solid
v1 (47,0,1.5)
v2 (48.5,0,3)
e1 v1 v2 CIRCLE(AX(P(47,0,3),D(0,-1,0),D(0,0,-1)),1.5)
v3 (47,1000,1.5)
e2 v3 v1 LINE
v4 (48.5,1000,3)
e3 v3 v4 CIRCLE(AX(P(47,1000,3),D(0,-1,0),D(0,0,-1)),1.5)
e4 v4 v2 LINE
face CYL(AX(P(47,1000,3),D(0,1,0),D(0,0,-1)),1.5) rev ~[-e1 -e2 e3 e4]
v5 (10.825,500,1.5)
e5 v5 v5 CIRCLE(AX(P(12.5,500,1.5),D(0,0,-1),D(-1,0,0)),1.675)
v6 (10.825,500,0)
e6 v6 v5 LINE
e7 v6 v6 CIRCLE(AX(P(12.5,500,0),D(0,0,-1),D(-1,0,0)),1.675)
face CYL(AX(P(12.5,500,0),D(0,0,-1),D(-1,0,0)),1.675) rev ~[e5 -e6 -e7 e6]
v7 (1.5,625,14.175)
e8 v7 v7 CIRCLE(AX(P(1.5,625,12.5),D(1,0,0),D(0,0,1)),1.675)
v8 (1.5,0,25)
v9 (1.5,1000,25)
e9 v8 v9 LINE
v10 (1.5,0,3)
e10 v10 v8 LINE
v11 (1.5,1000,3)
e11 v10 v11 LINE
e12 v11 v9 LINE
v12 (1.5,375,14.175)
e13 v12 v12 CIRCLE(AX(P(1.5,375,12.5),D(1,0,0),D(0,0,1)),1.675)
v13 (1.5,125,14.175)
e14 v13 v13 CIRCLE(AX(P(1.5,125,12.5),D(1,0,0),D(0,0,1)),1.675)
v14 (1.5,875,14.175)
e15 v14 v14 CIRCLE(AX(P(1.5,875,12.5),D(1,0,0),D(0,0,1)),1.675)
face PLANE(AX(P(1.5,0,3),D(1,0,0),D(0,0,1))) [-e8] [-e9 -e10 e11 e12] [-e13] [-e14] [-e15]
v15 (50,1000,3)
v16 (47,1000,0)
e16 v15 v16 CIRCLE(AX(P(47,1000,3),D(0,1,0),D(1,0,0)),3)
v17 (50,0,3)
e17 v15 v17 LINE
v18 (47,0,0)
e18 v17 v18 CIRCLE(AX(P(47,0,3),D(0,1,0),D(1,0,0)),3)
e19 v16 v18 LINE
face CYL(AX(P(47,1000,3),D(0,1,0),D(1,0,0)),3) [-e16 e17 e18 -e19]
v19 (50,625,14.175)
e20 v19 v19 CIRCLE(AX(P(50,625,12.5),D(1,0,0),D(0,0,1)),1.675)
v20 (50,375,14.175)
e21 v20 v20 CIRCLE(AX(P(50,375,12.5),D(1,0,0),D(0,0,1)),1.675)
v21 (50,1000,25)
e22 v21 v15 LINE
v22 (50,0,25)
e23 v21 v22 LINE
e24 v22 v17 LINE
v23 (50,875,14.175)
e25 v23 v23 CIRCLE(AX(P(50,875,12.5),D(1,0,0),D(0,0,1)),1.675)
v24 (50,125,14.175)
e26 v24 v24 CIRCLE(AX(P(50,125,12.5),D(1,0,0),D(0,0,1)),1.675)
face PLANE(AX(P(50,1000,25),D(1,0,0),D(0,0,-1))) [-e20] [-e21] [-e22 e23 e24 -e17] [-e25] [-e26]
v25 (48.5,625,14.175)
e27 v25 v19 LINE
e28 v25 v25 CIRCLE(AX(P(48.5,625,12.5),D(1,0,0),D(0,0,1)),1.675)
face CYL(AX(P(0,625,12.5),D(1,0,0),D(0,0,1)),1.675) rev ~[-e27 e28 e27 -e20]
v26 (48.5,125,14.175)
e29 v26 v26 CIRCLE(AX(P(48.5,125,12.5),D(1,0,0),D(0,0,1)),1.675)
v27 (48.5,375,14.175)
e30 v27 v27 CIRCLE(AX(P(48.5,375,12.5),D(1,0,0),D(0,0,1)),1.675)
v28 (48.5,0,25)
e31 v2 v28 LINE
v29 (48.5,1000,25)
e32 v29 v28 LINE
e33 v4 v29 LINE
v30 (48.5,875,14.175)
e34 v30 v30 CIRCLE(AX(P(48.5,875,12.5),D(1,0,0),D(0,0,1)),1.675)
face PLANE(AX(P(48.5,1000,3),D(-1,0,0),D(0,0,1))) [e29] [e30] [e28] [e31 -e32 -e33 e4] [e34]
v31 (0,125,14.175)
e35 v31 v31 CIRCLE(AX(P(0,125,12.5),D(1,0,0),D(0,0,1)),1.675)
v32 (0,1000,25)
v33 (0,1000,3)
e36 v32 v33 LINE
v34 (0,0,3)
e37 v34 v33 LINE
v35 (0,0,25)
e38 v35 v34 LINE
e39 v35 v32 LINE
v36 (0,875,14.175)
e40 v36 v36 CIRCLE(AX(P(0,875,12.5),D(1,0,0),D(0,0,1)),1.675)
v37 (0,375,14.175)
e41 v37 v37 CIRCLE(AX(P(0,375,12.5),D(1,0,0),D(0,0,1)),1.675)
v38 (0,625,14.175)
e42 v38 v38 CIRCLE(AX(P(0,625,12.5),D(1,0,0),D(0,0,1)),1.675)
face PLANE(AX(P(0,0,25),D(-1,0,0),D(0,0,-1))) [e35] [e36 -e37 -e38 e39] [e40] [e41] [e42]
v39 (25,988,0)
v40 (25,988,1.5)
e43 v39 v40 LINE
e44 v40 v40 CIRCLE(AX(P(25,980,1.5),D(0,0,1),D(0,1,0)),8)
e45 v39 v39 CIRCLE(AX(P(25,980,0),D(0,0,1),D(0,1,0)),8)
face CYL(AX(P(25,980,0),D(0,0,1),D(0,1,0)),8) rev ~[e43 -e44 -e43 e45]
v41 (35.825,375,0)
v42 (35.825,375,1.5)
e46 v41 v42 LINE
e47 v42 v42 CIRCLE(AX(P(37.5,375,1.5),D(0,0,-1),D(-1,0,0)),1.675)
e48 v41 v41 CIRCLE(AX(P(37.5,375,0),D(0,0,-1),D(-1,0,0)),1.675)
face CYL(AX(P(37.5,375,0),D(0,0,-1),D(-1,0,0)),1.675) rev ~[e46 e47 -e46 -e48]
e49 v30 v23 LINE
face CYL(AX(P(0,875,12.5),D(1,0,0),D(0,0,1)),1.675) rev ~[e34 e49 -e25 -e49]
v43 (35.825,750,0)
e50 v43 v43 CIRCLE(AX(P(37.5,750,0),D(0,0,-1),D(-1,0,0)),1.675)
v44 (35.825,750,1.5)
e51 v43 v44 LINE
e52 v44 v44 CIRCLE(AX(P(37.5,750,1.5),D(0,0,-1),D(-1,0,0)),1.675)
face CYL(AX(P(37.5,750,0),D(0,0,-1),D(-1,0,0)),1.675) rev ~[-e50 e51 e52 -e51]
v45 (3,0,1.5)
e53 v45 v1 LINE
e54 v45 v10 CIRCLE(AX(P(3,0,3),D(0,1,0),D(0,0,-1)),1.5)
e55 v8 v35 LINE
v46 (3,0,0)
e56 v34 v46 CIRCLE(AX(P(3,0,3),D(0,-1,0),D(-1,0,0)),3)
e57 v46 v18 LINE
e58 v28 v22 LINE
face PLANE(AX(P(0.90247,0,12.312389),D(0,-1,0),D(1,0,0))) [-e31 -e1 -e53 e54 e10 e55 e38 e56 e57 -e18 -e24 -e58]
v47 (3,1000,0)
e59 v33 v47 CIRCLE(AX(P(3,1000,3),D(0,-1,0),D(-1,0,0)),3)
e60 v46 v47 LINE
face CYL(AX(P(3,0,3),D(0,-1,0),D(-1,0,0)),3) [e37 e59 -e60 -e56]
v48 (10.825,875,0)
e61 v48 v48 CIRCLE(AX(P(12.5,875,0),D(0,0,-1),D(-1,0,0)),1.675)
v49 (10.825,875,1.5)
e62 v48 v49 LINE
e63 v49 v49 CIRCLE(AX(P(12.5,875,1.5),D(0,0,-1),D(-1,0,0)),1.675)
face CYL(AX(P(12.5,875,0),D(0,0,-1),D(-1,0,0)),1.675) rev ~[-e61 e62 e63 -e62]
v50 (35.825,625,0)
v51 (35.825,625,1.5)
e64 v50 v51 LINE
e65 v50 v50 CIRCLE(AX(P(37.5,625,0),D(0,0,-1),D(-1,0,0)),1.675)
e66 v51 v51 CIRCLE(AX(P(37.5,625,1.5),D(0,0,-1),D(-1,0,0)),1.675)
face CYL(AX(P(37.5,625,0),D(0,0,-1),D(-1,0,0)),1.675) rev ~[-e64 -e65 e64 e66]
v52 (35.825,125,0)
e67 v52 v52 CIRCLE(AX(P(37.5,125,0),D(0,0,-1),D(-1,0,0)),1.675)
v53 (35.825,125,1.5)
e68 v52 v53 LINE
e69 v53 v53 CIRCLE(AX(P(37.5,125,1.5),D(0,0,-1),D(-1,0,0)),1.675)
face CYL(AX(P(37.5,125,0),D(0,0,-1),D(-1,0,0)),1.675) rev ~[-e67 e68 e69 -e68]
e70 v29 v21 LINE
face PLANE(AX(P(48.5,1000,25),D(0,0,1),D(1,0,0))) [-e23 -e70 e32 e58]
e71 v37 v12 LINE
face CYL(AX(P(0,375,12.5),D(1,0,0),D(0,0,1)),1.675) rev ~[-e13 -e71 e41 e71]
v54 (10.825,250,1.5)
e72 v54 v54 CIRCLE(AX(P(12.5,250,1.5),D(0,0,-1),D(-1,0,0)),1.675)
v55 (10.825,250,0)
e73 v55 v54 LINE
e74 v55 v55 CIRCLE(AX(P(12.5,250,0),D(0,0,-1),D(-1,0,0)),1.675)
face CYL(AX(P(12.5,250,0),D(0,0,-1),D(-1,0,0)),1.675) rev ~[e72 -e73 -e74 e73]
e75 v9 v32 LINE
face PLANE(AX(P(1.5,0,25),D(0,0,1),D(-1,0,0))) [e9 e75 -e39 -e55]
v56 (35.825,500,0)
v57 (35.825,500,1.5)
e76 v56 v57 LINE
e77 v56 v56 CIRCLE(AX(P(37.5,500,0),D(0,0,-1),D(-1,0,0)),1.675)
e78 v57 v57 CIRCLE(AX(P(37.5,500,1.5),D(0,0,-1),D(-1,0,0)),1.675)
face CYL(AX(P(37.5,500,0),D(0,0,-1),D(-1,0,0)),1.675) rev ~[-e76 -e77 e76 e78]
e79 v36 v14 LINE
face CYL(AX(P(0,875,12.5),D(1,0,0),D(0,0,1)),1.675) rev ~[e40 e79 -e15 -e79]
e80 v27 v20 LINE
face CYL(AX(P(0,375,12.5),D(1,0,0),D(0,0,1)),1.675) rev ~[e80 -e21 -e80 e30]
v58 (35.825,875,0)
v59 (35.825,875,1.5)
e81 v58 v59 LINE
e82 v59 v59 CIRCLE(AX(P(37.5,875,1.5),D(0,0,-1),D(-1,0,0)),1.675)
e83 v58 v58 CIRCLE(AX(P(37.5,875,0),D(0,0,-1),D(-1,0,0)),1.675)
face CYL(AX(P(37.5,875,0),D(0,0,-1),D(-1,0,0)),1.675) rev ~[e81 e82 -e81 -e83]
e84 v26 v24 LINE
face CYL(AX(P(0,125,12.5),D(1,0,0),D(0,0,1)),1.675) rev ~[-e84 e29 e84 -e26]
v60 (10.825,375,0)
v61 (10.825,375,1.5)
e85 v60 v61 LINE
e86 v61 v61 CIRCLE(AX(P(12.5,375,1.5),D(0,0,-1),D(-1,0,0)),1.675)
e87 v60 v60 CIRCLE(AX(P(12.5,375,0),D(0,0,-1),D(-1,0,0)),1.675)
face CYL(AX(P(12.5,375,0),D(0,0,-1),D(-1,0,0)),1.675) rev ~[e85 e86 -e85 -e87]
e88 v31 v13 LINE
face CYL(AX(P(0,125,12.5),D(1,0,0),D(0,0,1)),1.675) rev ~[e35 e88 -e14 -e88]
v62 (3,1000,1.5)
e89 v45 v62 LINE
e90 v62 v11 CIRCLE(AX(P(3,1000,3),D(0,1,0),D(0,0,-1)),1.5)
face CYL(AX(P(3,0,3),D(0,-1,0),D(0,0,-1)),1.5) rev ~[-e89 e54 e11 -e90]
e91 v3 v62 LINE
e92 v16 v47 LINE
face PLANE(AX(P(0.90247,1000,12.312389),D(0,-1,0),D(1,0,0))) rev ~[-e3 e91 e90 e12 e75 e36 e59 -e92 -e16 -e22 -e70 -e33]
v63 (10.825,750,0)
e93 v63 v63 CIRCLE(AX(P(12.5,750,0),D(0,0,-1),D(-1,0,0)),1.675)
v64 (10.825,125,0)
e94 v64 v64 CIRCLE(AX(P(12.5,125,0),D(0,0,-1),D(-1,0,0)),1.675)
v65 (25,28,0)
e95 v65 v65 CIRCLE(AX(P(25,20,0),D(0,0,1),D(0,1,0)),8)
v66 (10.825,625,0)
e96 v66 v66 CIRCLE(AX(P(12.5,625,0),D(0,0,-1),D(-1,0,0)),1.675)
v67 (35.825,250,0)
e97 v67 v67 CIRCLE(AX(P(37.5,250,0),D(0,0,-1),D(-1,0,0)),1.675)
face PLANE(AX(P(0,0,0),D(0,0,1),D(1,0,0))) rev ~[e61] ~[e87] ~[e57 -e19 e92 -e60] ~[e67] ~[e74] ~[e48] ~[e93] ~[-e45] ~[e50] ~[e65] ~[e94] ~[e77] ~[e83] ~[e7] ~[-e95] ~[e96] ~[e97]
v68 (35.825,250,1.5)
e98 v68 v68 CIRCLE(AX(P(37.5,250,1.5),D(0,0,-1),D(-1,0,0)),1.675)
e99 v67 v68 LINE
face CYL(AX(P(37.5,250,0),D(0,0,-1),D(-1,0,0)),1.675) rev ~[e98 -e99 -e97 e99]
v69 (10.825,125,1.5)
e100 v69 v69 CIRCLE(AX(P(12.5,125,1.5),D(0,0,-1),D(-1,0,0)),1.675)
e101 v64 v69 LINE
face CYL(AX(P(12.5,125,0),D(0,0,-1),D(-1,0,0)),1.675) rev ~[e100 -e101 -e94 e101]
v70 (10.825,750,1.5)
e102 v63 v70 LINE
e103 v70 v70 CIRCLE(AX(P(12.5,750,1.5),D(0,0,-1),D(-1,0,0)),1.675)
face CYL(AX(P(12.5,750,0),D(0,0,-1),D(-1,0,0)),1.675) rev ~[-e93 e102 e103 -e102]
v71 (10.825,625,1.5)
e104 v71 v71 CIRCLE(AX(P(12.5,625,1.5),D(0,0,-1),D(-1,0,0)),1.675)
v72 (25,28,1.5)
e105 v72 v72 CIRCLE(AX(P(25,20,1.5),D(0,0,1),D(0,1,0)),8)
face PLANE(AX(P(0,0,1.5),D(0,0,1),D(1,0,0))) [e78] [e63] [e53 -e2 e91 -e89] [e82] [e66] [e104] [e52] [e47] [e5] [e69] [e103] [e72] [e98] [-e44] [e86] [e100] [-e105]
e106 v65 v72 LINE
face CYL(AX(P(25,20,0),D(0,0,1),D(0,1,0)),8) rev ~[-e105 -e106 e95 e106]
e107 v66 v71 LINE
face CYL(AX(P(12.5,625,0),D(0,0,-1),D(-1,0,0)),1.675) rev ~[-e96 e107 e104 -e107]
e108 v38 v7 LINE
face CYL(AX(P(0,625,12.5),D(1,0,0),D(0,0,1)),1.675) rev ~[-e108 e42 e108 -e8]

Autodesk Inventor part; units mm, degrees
ref_plane "YZ Plane" through (0, 0, 0) normal (1, 0, 0) x (0, 1, 0)
ref_plane "XZ Plane" through (0, 0, 0) normal (0, 1, 0) x (-1, 0, 0)
ref_plane "XY Plane" through (0, 0, 0) normal (0, 0, 1) x (1, 0, 0)
sketch "Sketch1" plane through (0, 0, 0) normal (0, 0, 1) x (1, 0, 0)
  line L0 (0, 0) -> (50, 0)
  line L1 (50, 0) -> (50, 1000)
  line L2 (50, 1000) -> (0, 1000)
  line L3 (0, 1000) -> (0, 0)
  dimension "d0" = 50
  dimension "d1" = 1000
extrude "Plate1" add sketch "Sketch1" along normal blind 1.5
sketch "Sketch2" plane through (48.5, 1000, 0) normal (1, 0, 0) x (0, 1, 0)
  line L0 (-1000, 0) -> (0, 0)
  line L1 (0, 0) -> (0, 25)
  line L2 (0, 25) -> (-1000, 25)
  line L3 (-1000, 25) -> (-1000, 0)
edge flange "Flange1" height 20 angle 90 thickness 1.5 bend radius 1.5 thickness toward (1, 0, 0) relief tear relief width 1.5 relief depth 0.75 edges at (50, 500, 1.5) wall of the first edge with corners at (48.5, 0, 0) (48.5, 1000, 0) (48.5, 1000, 25) (48.5, 0, 25)
bend "Bend1"
corner "Corner1"
sketch "Sketch3" plane through (1.5, 0, 0) normal (-1, 0, 0) x (0, -1, 0)
  line L0 (-1000, 0) -> (0, 0)
  line L1 (0, 0) -> (0, 25)
  line L2 (0, 25) -> (-1000, 25)
  line L3 (-1000, 25) -> (-1000, 0)
edge flange "Flange2" height 20 angle 90 thickness 1.5 bend radius 1.5 thickness toward (-1, 0, 0) relief tear relief width 1.5 relief depth 0.75 edges at (0, 500, 1.5) wall of the first edge with corners at (1.5, 1000, 0) (1.5, 0, 0) (1.5, 0, 25) (1.5, 1000, 25)
bend "Bend2"
corner "Corner2"
sketch "Sketch4" plane through (0, 0, 25) normal (-1, 0, 0) x (0, 0, 1)
  circle A0 centre (-12.5, 125) radius 1.675
  line L0 (0, 0) -> (-22, 0) projected
  circle A1 centre (-12.5, 375) radius 1.675
  line L1 (-22, 1000) -> (-22, 0) projected
  circle A2 centre (-12.5, 625) radius 1.675
  circle A3 centre (-12.5, 875) radius 1.675
  line L2 (-22, 1000) -> (0, 1000) projected
  line L3 (-25, 1000) -> (-25, 0) projected
  dimension "d23" = 3.35
  dimension "d24" = 125
  dimension "d25" = 3.35
  dimension "d26" = 250
  dimension "d29" = 3.35
  dimension "d30" = 250
  dimension "d32" = 3.35
  dimension "d33" = 250
  dimension "d35" = 125
  dimension "d56" = 10
  dimension "d57" = 10
  dimension "d58" = 10
  dimension "d59" = 10
hole "Hole1" at (0, 375, 12.5) at (0, 625, 12.5) at (0, 125, 12.5) at (0, 875, 12.5) direction (1, 0, 0) diameter 3.35 end through all
sketch "Sketch5" plane through (0, 0, 0) normal (0, 0, -1) x (-1, 0, 0)
  circle A0 centre (-25, 20) radius 8
  line L0 (-3, 0) -> (-47, 0) projected
  line L1 (0, 1000) -> (0, 0) projected
  circle A1 centre (-25, 980) radius 8
  line L2 (-47, 1000) -> (-3, 1000) projected
  dimension "d43" = 16
  dimension "d44" = 20
  dimension "d45" = 25
  dimension "d53" = 16
  dimension "d54" = 20
  dimension "d55" = 25
hole "Hole2" at (25, 20, 0) at (25, 980, 0) direction (0, 0, 1) diameter 16 end through all
sketch "Sketch6" plane through (0, 0, 0) normal (0, 0, -1) x (-1, 0, 0)
  circle A0 centre (-37.5, 125) radius 1.675
  line L0 (-3, 0) -> (-47, 0) projected
  line L1 (-50, 0) -> (-50, 1000) projected
  circle A1 centre (-12.5, 125) radius 1.675
  circle A2 centre (-37.5, 250) radius 1.675
  circle A3 centre (-12.5, 250) radius 1.675
  circle A4 centre (-37.5, 375) radius 1.675
  circle A5 centre (-12.5, 375) radius 1.675
  circle A6 centre (-37.5, 500) radius 1.675
  circle A7 centre (-12.5, 500) radius 1.675
  circle A8 centre (-37.5, 625) radius 1.675
  circle A9 centre (-12.5, 625) radius 1.675
  circle A10 centre (-37.5, 750) radius 1.675
  circle A11 centre (-12.5, 750) radius 1.675
  circle A12 centre (-37.5, 875) radius 1.675
  circle A13 centre (-12.5, 875) radius 1.675
  point P0 (0, 0)
  dimension "d60" = 3.35
  dimension "d61" = 125
  dimension "d62" = 12.5
  dimension "d63" = 3.35
  dimension "d64" = 25
  dimension "d67" = 125
extrude "Cut1" cut sketch "Sketch6" against normal blind 1.5
sketch "Sketch7" plane through (0, 0, 25) normal (-1, 0, 0) x (0, 0, 1)
  point P0 (-25, 0)
equation "\"d0\" = A_height"
equation "\"d1\" = A_length"
equation "\"d23\" = rivet_diameter"
equation "\"d24\" = 0.5 * rivet_displacement"
equation "\"d25\" = rivet_diameter"
equation "\"d26\" = rivet_displacement"
equation "\"d29\" = rivet_diameter"
equation "\"d30\" = rivet_displacement"
equation "\"d32\" = rivet_diameter"
equation "\"d33\" = rivet_displacement"
equation "\"d56\" = 0.25 * A_width"
equation "\"d57\" = 0.25 * A_width"
equation "\"d58\" = 0.25 * A_width"
equation "\"d59\" = 0.25 * A_width"
equation "\"d36\" = rivet_diameter"
equation "\"d41\" = Thickness"
equation "\"d43\" = A_joint_diameter"
equation "\"d45\" = 0.5 * A_height"
equation "\"d53\" = A_joint_diameter"
equation "\"d55\" = 0.5 * A_height"
equation "\"d46\" = A_joint_diameter"
equation "\"d51\" = Thickness"
equation "\"d60\" = rivet_diameter"
equation "\"d61\" = 0.5 * rivet_displacement"
equation "\"d63\" = rivet_diameter"
equation "\"d67\" = 0.5 * rivet_displacement"
equation "\"d72\" = Thickness"
equation "\"d2\" = Thickness"
equation "\"d3\" = BendReliefWidth"
equation "\"d4\" = BendReliefDepth"
equation "\"d5\" = MinimumRemnant"
equation "\"d6\" = TransitionRadius"
equation "\"d7\" = 0.5 * A_width"
equation "\"d9\" = BendRadius"
equation "\"d10\" = CornerReliefSize"
equation "\"d11\" = GapSize"
equation "\"d12\" = JacobiRadiusSize"
equation "\"d13\" = BendReliefWidth"
equation "\"d14\" = BendReliefDepth"
equation "\"d15\" = MinimumRemnant"
equation "\"d16\" = TransitionRadius"
equation "\"d17\" = 0.5 * A_width"
equation "\"d19\" = BendRadius"
equation "\"d20\" = CornerReliefSize"
equation "\"d21\" = GapSize"
equation "\"d22\" = JacobiRadiusSize"
equation "\"Thickness\" = plate_thickness"
equation "\"BendRadius\" = Thickness"
equation "\"BendReliefWidth\" = Thickness"
equation "\"BendReliefDepth\" = 0.5 * Thickness"
equation "\"CornerReliefSize\" = 4 * Thickness"
equation "\"MinimumRemnant\" = 2 * Thickness"
equation "\"TransitionRadius\" = BendRadius"
equation "\"JacobiRadiusSize\" = BendRadius"
equation "\"GapSize\" = Thickness"
equation "\"A_length\" = 1000"
equation "\"l___________\" = 0"
equation "\"l__________\" = 0"
equation "\"l_________\" = 0"
equation "\"rivet_diameter\" = 3.35"
equation "\"rivet_displacement\" = 250"
equation "\"l________\" = 0"
equation "\"plate_thickness\" = 1.5"
equation "\"A_joint_diameter\" = 16"
equation "\"A_height\" = 50"
equation "\"A_joint_tolerance\" = 3"
equation "\"A_B_spacing\" = 2"
equation "\"L_Piston_Bottom\" = 21"
equation "\"L_Piston_Top\" = 25"
equation "\"A_width\" = 40"
properties part number "Beam_A1"
